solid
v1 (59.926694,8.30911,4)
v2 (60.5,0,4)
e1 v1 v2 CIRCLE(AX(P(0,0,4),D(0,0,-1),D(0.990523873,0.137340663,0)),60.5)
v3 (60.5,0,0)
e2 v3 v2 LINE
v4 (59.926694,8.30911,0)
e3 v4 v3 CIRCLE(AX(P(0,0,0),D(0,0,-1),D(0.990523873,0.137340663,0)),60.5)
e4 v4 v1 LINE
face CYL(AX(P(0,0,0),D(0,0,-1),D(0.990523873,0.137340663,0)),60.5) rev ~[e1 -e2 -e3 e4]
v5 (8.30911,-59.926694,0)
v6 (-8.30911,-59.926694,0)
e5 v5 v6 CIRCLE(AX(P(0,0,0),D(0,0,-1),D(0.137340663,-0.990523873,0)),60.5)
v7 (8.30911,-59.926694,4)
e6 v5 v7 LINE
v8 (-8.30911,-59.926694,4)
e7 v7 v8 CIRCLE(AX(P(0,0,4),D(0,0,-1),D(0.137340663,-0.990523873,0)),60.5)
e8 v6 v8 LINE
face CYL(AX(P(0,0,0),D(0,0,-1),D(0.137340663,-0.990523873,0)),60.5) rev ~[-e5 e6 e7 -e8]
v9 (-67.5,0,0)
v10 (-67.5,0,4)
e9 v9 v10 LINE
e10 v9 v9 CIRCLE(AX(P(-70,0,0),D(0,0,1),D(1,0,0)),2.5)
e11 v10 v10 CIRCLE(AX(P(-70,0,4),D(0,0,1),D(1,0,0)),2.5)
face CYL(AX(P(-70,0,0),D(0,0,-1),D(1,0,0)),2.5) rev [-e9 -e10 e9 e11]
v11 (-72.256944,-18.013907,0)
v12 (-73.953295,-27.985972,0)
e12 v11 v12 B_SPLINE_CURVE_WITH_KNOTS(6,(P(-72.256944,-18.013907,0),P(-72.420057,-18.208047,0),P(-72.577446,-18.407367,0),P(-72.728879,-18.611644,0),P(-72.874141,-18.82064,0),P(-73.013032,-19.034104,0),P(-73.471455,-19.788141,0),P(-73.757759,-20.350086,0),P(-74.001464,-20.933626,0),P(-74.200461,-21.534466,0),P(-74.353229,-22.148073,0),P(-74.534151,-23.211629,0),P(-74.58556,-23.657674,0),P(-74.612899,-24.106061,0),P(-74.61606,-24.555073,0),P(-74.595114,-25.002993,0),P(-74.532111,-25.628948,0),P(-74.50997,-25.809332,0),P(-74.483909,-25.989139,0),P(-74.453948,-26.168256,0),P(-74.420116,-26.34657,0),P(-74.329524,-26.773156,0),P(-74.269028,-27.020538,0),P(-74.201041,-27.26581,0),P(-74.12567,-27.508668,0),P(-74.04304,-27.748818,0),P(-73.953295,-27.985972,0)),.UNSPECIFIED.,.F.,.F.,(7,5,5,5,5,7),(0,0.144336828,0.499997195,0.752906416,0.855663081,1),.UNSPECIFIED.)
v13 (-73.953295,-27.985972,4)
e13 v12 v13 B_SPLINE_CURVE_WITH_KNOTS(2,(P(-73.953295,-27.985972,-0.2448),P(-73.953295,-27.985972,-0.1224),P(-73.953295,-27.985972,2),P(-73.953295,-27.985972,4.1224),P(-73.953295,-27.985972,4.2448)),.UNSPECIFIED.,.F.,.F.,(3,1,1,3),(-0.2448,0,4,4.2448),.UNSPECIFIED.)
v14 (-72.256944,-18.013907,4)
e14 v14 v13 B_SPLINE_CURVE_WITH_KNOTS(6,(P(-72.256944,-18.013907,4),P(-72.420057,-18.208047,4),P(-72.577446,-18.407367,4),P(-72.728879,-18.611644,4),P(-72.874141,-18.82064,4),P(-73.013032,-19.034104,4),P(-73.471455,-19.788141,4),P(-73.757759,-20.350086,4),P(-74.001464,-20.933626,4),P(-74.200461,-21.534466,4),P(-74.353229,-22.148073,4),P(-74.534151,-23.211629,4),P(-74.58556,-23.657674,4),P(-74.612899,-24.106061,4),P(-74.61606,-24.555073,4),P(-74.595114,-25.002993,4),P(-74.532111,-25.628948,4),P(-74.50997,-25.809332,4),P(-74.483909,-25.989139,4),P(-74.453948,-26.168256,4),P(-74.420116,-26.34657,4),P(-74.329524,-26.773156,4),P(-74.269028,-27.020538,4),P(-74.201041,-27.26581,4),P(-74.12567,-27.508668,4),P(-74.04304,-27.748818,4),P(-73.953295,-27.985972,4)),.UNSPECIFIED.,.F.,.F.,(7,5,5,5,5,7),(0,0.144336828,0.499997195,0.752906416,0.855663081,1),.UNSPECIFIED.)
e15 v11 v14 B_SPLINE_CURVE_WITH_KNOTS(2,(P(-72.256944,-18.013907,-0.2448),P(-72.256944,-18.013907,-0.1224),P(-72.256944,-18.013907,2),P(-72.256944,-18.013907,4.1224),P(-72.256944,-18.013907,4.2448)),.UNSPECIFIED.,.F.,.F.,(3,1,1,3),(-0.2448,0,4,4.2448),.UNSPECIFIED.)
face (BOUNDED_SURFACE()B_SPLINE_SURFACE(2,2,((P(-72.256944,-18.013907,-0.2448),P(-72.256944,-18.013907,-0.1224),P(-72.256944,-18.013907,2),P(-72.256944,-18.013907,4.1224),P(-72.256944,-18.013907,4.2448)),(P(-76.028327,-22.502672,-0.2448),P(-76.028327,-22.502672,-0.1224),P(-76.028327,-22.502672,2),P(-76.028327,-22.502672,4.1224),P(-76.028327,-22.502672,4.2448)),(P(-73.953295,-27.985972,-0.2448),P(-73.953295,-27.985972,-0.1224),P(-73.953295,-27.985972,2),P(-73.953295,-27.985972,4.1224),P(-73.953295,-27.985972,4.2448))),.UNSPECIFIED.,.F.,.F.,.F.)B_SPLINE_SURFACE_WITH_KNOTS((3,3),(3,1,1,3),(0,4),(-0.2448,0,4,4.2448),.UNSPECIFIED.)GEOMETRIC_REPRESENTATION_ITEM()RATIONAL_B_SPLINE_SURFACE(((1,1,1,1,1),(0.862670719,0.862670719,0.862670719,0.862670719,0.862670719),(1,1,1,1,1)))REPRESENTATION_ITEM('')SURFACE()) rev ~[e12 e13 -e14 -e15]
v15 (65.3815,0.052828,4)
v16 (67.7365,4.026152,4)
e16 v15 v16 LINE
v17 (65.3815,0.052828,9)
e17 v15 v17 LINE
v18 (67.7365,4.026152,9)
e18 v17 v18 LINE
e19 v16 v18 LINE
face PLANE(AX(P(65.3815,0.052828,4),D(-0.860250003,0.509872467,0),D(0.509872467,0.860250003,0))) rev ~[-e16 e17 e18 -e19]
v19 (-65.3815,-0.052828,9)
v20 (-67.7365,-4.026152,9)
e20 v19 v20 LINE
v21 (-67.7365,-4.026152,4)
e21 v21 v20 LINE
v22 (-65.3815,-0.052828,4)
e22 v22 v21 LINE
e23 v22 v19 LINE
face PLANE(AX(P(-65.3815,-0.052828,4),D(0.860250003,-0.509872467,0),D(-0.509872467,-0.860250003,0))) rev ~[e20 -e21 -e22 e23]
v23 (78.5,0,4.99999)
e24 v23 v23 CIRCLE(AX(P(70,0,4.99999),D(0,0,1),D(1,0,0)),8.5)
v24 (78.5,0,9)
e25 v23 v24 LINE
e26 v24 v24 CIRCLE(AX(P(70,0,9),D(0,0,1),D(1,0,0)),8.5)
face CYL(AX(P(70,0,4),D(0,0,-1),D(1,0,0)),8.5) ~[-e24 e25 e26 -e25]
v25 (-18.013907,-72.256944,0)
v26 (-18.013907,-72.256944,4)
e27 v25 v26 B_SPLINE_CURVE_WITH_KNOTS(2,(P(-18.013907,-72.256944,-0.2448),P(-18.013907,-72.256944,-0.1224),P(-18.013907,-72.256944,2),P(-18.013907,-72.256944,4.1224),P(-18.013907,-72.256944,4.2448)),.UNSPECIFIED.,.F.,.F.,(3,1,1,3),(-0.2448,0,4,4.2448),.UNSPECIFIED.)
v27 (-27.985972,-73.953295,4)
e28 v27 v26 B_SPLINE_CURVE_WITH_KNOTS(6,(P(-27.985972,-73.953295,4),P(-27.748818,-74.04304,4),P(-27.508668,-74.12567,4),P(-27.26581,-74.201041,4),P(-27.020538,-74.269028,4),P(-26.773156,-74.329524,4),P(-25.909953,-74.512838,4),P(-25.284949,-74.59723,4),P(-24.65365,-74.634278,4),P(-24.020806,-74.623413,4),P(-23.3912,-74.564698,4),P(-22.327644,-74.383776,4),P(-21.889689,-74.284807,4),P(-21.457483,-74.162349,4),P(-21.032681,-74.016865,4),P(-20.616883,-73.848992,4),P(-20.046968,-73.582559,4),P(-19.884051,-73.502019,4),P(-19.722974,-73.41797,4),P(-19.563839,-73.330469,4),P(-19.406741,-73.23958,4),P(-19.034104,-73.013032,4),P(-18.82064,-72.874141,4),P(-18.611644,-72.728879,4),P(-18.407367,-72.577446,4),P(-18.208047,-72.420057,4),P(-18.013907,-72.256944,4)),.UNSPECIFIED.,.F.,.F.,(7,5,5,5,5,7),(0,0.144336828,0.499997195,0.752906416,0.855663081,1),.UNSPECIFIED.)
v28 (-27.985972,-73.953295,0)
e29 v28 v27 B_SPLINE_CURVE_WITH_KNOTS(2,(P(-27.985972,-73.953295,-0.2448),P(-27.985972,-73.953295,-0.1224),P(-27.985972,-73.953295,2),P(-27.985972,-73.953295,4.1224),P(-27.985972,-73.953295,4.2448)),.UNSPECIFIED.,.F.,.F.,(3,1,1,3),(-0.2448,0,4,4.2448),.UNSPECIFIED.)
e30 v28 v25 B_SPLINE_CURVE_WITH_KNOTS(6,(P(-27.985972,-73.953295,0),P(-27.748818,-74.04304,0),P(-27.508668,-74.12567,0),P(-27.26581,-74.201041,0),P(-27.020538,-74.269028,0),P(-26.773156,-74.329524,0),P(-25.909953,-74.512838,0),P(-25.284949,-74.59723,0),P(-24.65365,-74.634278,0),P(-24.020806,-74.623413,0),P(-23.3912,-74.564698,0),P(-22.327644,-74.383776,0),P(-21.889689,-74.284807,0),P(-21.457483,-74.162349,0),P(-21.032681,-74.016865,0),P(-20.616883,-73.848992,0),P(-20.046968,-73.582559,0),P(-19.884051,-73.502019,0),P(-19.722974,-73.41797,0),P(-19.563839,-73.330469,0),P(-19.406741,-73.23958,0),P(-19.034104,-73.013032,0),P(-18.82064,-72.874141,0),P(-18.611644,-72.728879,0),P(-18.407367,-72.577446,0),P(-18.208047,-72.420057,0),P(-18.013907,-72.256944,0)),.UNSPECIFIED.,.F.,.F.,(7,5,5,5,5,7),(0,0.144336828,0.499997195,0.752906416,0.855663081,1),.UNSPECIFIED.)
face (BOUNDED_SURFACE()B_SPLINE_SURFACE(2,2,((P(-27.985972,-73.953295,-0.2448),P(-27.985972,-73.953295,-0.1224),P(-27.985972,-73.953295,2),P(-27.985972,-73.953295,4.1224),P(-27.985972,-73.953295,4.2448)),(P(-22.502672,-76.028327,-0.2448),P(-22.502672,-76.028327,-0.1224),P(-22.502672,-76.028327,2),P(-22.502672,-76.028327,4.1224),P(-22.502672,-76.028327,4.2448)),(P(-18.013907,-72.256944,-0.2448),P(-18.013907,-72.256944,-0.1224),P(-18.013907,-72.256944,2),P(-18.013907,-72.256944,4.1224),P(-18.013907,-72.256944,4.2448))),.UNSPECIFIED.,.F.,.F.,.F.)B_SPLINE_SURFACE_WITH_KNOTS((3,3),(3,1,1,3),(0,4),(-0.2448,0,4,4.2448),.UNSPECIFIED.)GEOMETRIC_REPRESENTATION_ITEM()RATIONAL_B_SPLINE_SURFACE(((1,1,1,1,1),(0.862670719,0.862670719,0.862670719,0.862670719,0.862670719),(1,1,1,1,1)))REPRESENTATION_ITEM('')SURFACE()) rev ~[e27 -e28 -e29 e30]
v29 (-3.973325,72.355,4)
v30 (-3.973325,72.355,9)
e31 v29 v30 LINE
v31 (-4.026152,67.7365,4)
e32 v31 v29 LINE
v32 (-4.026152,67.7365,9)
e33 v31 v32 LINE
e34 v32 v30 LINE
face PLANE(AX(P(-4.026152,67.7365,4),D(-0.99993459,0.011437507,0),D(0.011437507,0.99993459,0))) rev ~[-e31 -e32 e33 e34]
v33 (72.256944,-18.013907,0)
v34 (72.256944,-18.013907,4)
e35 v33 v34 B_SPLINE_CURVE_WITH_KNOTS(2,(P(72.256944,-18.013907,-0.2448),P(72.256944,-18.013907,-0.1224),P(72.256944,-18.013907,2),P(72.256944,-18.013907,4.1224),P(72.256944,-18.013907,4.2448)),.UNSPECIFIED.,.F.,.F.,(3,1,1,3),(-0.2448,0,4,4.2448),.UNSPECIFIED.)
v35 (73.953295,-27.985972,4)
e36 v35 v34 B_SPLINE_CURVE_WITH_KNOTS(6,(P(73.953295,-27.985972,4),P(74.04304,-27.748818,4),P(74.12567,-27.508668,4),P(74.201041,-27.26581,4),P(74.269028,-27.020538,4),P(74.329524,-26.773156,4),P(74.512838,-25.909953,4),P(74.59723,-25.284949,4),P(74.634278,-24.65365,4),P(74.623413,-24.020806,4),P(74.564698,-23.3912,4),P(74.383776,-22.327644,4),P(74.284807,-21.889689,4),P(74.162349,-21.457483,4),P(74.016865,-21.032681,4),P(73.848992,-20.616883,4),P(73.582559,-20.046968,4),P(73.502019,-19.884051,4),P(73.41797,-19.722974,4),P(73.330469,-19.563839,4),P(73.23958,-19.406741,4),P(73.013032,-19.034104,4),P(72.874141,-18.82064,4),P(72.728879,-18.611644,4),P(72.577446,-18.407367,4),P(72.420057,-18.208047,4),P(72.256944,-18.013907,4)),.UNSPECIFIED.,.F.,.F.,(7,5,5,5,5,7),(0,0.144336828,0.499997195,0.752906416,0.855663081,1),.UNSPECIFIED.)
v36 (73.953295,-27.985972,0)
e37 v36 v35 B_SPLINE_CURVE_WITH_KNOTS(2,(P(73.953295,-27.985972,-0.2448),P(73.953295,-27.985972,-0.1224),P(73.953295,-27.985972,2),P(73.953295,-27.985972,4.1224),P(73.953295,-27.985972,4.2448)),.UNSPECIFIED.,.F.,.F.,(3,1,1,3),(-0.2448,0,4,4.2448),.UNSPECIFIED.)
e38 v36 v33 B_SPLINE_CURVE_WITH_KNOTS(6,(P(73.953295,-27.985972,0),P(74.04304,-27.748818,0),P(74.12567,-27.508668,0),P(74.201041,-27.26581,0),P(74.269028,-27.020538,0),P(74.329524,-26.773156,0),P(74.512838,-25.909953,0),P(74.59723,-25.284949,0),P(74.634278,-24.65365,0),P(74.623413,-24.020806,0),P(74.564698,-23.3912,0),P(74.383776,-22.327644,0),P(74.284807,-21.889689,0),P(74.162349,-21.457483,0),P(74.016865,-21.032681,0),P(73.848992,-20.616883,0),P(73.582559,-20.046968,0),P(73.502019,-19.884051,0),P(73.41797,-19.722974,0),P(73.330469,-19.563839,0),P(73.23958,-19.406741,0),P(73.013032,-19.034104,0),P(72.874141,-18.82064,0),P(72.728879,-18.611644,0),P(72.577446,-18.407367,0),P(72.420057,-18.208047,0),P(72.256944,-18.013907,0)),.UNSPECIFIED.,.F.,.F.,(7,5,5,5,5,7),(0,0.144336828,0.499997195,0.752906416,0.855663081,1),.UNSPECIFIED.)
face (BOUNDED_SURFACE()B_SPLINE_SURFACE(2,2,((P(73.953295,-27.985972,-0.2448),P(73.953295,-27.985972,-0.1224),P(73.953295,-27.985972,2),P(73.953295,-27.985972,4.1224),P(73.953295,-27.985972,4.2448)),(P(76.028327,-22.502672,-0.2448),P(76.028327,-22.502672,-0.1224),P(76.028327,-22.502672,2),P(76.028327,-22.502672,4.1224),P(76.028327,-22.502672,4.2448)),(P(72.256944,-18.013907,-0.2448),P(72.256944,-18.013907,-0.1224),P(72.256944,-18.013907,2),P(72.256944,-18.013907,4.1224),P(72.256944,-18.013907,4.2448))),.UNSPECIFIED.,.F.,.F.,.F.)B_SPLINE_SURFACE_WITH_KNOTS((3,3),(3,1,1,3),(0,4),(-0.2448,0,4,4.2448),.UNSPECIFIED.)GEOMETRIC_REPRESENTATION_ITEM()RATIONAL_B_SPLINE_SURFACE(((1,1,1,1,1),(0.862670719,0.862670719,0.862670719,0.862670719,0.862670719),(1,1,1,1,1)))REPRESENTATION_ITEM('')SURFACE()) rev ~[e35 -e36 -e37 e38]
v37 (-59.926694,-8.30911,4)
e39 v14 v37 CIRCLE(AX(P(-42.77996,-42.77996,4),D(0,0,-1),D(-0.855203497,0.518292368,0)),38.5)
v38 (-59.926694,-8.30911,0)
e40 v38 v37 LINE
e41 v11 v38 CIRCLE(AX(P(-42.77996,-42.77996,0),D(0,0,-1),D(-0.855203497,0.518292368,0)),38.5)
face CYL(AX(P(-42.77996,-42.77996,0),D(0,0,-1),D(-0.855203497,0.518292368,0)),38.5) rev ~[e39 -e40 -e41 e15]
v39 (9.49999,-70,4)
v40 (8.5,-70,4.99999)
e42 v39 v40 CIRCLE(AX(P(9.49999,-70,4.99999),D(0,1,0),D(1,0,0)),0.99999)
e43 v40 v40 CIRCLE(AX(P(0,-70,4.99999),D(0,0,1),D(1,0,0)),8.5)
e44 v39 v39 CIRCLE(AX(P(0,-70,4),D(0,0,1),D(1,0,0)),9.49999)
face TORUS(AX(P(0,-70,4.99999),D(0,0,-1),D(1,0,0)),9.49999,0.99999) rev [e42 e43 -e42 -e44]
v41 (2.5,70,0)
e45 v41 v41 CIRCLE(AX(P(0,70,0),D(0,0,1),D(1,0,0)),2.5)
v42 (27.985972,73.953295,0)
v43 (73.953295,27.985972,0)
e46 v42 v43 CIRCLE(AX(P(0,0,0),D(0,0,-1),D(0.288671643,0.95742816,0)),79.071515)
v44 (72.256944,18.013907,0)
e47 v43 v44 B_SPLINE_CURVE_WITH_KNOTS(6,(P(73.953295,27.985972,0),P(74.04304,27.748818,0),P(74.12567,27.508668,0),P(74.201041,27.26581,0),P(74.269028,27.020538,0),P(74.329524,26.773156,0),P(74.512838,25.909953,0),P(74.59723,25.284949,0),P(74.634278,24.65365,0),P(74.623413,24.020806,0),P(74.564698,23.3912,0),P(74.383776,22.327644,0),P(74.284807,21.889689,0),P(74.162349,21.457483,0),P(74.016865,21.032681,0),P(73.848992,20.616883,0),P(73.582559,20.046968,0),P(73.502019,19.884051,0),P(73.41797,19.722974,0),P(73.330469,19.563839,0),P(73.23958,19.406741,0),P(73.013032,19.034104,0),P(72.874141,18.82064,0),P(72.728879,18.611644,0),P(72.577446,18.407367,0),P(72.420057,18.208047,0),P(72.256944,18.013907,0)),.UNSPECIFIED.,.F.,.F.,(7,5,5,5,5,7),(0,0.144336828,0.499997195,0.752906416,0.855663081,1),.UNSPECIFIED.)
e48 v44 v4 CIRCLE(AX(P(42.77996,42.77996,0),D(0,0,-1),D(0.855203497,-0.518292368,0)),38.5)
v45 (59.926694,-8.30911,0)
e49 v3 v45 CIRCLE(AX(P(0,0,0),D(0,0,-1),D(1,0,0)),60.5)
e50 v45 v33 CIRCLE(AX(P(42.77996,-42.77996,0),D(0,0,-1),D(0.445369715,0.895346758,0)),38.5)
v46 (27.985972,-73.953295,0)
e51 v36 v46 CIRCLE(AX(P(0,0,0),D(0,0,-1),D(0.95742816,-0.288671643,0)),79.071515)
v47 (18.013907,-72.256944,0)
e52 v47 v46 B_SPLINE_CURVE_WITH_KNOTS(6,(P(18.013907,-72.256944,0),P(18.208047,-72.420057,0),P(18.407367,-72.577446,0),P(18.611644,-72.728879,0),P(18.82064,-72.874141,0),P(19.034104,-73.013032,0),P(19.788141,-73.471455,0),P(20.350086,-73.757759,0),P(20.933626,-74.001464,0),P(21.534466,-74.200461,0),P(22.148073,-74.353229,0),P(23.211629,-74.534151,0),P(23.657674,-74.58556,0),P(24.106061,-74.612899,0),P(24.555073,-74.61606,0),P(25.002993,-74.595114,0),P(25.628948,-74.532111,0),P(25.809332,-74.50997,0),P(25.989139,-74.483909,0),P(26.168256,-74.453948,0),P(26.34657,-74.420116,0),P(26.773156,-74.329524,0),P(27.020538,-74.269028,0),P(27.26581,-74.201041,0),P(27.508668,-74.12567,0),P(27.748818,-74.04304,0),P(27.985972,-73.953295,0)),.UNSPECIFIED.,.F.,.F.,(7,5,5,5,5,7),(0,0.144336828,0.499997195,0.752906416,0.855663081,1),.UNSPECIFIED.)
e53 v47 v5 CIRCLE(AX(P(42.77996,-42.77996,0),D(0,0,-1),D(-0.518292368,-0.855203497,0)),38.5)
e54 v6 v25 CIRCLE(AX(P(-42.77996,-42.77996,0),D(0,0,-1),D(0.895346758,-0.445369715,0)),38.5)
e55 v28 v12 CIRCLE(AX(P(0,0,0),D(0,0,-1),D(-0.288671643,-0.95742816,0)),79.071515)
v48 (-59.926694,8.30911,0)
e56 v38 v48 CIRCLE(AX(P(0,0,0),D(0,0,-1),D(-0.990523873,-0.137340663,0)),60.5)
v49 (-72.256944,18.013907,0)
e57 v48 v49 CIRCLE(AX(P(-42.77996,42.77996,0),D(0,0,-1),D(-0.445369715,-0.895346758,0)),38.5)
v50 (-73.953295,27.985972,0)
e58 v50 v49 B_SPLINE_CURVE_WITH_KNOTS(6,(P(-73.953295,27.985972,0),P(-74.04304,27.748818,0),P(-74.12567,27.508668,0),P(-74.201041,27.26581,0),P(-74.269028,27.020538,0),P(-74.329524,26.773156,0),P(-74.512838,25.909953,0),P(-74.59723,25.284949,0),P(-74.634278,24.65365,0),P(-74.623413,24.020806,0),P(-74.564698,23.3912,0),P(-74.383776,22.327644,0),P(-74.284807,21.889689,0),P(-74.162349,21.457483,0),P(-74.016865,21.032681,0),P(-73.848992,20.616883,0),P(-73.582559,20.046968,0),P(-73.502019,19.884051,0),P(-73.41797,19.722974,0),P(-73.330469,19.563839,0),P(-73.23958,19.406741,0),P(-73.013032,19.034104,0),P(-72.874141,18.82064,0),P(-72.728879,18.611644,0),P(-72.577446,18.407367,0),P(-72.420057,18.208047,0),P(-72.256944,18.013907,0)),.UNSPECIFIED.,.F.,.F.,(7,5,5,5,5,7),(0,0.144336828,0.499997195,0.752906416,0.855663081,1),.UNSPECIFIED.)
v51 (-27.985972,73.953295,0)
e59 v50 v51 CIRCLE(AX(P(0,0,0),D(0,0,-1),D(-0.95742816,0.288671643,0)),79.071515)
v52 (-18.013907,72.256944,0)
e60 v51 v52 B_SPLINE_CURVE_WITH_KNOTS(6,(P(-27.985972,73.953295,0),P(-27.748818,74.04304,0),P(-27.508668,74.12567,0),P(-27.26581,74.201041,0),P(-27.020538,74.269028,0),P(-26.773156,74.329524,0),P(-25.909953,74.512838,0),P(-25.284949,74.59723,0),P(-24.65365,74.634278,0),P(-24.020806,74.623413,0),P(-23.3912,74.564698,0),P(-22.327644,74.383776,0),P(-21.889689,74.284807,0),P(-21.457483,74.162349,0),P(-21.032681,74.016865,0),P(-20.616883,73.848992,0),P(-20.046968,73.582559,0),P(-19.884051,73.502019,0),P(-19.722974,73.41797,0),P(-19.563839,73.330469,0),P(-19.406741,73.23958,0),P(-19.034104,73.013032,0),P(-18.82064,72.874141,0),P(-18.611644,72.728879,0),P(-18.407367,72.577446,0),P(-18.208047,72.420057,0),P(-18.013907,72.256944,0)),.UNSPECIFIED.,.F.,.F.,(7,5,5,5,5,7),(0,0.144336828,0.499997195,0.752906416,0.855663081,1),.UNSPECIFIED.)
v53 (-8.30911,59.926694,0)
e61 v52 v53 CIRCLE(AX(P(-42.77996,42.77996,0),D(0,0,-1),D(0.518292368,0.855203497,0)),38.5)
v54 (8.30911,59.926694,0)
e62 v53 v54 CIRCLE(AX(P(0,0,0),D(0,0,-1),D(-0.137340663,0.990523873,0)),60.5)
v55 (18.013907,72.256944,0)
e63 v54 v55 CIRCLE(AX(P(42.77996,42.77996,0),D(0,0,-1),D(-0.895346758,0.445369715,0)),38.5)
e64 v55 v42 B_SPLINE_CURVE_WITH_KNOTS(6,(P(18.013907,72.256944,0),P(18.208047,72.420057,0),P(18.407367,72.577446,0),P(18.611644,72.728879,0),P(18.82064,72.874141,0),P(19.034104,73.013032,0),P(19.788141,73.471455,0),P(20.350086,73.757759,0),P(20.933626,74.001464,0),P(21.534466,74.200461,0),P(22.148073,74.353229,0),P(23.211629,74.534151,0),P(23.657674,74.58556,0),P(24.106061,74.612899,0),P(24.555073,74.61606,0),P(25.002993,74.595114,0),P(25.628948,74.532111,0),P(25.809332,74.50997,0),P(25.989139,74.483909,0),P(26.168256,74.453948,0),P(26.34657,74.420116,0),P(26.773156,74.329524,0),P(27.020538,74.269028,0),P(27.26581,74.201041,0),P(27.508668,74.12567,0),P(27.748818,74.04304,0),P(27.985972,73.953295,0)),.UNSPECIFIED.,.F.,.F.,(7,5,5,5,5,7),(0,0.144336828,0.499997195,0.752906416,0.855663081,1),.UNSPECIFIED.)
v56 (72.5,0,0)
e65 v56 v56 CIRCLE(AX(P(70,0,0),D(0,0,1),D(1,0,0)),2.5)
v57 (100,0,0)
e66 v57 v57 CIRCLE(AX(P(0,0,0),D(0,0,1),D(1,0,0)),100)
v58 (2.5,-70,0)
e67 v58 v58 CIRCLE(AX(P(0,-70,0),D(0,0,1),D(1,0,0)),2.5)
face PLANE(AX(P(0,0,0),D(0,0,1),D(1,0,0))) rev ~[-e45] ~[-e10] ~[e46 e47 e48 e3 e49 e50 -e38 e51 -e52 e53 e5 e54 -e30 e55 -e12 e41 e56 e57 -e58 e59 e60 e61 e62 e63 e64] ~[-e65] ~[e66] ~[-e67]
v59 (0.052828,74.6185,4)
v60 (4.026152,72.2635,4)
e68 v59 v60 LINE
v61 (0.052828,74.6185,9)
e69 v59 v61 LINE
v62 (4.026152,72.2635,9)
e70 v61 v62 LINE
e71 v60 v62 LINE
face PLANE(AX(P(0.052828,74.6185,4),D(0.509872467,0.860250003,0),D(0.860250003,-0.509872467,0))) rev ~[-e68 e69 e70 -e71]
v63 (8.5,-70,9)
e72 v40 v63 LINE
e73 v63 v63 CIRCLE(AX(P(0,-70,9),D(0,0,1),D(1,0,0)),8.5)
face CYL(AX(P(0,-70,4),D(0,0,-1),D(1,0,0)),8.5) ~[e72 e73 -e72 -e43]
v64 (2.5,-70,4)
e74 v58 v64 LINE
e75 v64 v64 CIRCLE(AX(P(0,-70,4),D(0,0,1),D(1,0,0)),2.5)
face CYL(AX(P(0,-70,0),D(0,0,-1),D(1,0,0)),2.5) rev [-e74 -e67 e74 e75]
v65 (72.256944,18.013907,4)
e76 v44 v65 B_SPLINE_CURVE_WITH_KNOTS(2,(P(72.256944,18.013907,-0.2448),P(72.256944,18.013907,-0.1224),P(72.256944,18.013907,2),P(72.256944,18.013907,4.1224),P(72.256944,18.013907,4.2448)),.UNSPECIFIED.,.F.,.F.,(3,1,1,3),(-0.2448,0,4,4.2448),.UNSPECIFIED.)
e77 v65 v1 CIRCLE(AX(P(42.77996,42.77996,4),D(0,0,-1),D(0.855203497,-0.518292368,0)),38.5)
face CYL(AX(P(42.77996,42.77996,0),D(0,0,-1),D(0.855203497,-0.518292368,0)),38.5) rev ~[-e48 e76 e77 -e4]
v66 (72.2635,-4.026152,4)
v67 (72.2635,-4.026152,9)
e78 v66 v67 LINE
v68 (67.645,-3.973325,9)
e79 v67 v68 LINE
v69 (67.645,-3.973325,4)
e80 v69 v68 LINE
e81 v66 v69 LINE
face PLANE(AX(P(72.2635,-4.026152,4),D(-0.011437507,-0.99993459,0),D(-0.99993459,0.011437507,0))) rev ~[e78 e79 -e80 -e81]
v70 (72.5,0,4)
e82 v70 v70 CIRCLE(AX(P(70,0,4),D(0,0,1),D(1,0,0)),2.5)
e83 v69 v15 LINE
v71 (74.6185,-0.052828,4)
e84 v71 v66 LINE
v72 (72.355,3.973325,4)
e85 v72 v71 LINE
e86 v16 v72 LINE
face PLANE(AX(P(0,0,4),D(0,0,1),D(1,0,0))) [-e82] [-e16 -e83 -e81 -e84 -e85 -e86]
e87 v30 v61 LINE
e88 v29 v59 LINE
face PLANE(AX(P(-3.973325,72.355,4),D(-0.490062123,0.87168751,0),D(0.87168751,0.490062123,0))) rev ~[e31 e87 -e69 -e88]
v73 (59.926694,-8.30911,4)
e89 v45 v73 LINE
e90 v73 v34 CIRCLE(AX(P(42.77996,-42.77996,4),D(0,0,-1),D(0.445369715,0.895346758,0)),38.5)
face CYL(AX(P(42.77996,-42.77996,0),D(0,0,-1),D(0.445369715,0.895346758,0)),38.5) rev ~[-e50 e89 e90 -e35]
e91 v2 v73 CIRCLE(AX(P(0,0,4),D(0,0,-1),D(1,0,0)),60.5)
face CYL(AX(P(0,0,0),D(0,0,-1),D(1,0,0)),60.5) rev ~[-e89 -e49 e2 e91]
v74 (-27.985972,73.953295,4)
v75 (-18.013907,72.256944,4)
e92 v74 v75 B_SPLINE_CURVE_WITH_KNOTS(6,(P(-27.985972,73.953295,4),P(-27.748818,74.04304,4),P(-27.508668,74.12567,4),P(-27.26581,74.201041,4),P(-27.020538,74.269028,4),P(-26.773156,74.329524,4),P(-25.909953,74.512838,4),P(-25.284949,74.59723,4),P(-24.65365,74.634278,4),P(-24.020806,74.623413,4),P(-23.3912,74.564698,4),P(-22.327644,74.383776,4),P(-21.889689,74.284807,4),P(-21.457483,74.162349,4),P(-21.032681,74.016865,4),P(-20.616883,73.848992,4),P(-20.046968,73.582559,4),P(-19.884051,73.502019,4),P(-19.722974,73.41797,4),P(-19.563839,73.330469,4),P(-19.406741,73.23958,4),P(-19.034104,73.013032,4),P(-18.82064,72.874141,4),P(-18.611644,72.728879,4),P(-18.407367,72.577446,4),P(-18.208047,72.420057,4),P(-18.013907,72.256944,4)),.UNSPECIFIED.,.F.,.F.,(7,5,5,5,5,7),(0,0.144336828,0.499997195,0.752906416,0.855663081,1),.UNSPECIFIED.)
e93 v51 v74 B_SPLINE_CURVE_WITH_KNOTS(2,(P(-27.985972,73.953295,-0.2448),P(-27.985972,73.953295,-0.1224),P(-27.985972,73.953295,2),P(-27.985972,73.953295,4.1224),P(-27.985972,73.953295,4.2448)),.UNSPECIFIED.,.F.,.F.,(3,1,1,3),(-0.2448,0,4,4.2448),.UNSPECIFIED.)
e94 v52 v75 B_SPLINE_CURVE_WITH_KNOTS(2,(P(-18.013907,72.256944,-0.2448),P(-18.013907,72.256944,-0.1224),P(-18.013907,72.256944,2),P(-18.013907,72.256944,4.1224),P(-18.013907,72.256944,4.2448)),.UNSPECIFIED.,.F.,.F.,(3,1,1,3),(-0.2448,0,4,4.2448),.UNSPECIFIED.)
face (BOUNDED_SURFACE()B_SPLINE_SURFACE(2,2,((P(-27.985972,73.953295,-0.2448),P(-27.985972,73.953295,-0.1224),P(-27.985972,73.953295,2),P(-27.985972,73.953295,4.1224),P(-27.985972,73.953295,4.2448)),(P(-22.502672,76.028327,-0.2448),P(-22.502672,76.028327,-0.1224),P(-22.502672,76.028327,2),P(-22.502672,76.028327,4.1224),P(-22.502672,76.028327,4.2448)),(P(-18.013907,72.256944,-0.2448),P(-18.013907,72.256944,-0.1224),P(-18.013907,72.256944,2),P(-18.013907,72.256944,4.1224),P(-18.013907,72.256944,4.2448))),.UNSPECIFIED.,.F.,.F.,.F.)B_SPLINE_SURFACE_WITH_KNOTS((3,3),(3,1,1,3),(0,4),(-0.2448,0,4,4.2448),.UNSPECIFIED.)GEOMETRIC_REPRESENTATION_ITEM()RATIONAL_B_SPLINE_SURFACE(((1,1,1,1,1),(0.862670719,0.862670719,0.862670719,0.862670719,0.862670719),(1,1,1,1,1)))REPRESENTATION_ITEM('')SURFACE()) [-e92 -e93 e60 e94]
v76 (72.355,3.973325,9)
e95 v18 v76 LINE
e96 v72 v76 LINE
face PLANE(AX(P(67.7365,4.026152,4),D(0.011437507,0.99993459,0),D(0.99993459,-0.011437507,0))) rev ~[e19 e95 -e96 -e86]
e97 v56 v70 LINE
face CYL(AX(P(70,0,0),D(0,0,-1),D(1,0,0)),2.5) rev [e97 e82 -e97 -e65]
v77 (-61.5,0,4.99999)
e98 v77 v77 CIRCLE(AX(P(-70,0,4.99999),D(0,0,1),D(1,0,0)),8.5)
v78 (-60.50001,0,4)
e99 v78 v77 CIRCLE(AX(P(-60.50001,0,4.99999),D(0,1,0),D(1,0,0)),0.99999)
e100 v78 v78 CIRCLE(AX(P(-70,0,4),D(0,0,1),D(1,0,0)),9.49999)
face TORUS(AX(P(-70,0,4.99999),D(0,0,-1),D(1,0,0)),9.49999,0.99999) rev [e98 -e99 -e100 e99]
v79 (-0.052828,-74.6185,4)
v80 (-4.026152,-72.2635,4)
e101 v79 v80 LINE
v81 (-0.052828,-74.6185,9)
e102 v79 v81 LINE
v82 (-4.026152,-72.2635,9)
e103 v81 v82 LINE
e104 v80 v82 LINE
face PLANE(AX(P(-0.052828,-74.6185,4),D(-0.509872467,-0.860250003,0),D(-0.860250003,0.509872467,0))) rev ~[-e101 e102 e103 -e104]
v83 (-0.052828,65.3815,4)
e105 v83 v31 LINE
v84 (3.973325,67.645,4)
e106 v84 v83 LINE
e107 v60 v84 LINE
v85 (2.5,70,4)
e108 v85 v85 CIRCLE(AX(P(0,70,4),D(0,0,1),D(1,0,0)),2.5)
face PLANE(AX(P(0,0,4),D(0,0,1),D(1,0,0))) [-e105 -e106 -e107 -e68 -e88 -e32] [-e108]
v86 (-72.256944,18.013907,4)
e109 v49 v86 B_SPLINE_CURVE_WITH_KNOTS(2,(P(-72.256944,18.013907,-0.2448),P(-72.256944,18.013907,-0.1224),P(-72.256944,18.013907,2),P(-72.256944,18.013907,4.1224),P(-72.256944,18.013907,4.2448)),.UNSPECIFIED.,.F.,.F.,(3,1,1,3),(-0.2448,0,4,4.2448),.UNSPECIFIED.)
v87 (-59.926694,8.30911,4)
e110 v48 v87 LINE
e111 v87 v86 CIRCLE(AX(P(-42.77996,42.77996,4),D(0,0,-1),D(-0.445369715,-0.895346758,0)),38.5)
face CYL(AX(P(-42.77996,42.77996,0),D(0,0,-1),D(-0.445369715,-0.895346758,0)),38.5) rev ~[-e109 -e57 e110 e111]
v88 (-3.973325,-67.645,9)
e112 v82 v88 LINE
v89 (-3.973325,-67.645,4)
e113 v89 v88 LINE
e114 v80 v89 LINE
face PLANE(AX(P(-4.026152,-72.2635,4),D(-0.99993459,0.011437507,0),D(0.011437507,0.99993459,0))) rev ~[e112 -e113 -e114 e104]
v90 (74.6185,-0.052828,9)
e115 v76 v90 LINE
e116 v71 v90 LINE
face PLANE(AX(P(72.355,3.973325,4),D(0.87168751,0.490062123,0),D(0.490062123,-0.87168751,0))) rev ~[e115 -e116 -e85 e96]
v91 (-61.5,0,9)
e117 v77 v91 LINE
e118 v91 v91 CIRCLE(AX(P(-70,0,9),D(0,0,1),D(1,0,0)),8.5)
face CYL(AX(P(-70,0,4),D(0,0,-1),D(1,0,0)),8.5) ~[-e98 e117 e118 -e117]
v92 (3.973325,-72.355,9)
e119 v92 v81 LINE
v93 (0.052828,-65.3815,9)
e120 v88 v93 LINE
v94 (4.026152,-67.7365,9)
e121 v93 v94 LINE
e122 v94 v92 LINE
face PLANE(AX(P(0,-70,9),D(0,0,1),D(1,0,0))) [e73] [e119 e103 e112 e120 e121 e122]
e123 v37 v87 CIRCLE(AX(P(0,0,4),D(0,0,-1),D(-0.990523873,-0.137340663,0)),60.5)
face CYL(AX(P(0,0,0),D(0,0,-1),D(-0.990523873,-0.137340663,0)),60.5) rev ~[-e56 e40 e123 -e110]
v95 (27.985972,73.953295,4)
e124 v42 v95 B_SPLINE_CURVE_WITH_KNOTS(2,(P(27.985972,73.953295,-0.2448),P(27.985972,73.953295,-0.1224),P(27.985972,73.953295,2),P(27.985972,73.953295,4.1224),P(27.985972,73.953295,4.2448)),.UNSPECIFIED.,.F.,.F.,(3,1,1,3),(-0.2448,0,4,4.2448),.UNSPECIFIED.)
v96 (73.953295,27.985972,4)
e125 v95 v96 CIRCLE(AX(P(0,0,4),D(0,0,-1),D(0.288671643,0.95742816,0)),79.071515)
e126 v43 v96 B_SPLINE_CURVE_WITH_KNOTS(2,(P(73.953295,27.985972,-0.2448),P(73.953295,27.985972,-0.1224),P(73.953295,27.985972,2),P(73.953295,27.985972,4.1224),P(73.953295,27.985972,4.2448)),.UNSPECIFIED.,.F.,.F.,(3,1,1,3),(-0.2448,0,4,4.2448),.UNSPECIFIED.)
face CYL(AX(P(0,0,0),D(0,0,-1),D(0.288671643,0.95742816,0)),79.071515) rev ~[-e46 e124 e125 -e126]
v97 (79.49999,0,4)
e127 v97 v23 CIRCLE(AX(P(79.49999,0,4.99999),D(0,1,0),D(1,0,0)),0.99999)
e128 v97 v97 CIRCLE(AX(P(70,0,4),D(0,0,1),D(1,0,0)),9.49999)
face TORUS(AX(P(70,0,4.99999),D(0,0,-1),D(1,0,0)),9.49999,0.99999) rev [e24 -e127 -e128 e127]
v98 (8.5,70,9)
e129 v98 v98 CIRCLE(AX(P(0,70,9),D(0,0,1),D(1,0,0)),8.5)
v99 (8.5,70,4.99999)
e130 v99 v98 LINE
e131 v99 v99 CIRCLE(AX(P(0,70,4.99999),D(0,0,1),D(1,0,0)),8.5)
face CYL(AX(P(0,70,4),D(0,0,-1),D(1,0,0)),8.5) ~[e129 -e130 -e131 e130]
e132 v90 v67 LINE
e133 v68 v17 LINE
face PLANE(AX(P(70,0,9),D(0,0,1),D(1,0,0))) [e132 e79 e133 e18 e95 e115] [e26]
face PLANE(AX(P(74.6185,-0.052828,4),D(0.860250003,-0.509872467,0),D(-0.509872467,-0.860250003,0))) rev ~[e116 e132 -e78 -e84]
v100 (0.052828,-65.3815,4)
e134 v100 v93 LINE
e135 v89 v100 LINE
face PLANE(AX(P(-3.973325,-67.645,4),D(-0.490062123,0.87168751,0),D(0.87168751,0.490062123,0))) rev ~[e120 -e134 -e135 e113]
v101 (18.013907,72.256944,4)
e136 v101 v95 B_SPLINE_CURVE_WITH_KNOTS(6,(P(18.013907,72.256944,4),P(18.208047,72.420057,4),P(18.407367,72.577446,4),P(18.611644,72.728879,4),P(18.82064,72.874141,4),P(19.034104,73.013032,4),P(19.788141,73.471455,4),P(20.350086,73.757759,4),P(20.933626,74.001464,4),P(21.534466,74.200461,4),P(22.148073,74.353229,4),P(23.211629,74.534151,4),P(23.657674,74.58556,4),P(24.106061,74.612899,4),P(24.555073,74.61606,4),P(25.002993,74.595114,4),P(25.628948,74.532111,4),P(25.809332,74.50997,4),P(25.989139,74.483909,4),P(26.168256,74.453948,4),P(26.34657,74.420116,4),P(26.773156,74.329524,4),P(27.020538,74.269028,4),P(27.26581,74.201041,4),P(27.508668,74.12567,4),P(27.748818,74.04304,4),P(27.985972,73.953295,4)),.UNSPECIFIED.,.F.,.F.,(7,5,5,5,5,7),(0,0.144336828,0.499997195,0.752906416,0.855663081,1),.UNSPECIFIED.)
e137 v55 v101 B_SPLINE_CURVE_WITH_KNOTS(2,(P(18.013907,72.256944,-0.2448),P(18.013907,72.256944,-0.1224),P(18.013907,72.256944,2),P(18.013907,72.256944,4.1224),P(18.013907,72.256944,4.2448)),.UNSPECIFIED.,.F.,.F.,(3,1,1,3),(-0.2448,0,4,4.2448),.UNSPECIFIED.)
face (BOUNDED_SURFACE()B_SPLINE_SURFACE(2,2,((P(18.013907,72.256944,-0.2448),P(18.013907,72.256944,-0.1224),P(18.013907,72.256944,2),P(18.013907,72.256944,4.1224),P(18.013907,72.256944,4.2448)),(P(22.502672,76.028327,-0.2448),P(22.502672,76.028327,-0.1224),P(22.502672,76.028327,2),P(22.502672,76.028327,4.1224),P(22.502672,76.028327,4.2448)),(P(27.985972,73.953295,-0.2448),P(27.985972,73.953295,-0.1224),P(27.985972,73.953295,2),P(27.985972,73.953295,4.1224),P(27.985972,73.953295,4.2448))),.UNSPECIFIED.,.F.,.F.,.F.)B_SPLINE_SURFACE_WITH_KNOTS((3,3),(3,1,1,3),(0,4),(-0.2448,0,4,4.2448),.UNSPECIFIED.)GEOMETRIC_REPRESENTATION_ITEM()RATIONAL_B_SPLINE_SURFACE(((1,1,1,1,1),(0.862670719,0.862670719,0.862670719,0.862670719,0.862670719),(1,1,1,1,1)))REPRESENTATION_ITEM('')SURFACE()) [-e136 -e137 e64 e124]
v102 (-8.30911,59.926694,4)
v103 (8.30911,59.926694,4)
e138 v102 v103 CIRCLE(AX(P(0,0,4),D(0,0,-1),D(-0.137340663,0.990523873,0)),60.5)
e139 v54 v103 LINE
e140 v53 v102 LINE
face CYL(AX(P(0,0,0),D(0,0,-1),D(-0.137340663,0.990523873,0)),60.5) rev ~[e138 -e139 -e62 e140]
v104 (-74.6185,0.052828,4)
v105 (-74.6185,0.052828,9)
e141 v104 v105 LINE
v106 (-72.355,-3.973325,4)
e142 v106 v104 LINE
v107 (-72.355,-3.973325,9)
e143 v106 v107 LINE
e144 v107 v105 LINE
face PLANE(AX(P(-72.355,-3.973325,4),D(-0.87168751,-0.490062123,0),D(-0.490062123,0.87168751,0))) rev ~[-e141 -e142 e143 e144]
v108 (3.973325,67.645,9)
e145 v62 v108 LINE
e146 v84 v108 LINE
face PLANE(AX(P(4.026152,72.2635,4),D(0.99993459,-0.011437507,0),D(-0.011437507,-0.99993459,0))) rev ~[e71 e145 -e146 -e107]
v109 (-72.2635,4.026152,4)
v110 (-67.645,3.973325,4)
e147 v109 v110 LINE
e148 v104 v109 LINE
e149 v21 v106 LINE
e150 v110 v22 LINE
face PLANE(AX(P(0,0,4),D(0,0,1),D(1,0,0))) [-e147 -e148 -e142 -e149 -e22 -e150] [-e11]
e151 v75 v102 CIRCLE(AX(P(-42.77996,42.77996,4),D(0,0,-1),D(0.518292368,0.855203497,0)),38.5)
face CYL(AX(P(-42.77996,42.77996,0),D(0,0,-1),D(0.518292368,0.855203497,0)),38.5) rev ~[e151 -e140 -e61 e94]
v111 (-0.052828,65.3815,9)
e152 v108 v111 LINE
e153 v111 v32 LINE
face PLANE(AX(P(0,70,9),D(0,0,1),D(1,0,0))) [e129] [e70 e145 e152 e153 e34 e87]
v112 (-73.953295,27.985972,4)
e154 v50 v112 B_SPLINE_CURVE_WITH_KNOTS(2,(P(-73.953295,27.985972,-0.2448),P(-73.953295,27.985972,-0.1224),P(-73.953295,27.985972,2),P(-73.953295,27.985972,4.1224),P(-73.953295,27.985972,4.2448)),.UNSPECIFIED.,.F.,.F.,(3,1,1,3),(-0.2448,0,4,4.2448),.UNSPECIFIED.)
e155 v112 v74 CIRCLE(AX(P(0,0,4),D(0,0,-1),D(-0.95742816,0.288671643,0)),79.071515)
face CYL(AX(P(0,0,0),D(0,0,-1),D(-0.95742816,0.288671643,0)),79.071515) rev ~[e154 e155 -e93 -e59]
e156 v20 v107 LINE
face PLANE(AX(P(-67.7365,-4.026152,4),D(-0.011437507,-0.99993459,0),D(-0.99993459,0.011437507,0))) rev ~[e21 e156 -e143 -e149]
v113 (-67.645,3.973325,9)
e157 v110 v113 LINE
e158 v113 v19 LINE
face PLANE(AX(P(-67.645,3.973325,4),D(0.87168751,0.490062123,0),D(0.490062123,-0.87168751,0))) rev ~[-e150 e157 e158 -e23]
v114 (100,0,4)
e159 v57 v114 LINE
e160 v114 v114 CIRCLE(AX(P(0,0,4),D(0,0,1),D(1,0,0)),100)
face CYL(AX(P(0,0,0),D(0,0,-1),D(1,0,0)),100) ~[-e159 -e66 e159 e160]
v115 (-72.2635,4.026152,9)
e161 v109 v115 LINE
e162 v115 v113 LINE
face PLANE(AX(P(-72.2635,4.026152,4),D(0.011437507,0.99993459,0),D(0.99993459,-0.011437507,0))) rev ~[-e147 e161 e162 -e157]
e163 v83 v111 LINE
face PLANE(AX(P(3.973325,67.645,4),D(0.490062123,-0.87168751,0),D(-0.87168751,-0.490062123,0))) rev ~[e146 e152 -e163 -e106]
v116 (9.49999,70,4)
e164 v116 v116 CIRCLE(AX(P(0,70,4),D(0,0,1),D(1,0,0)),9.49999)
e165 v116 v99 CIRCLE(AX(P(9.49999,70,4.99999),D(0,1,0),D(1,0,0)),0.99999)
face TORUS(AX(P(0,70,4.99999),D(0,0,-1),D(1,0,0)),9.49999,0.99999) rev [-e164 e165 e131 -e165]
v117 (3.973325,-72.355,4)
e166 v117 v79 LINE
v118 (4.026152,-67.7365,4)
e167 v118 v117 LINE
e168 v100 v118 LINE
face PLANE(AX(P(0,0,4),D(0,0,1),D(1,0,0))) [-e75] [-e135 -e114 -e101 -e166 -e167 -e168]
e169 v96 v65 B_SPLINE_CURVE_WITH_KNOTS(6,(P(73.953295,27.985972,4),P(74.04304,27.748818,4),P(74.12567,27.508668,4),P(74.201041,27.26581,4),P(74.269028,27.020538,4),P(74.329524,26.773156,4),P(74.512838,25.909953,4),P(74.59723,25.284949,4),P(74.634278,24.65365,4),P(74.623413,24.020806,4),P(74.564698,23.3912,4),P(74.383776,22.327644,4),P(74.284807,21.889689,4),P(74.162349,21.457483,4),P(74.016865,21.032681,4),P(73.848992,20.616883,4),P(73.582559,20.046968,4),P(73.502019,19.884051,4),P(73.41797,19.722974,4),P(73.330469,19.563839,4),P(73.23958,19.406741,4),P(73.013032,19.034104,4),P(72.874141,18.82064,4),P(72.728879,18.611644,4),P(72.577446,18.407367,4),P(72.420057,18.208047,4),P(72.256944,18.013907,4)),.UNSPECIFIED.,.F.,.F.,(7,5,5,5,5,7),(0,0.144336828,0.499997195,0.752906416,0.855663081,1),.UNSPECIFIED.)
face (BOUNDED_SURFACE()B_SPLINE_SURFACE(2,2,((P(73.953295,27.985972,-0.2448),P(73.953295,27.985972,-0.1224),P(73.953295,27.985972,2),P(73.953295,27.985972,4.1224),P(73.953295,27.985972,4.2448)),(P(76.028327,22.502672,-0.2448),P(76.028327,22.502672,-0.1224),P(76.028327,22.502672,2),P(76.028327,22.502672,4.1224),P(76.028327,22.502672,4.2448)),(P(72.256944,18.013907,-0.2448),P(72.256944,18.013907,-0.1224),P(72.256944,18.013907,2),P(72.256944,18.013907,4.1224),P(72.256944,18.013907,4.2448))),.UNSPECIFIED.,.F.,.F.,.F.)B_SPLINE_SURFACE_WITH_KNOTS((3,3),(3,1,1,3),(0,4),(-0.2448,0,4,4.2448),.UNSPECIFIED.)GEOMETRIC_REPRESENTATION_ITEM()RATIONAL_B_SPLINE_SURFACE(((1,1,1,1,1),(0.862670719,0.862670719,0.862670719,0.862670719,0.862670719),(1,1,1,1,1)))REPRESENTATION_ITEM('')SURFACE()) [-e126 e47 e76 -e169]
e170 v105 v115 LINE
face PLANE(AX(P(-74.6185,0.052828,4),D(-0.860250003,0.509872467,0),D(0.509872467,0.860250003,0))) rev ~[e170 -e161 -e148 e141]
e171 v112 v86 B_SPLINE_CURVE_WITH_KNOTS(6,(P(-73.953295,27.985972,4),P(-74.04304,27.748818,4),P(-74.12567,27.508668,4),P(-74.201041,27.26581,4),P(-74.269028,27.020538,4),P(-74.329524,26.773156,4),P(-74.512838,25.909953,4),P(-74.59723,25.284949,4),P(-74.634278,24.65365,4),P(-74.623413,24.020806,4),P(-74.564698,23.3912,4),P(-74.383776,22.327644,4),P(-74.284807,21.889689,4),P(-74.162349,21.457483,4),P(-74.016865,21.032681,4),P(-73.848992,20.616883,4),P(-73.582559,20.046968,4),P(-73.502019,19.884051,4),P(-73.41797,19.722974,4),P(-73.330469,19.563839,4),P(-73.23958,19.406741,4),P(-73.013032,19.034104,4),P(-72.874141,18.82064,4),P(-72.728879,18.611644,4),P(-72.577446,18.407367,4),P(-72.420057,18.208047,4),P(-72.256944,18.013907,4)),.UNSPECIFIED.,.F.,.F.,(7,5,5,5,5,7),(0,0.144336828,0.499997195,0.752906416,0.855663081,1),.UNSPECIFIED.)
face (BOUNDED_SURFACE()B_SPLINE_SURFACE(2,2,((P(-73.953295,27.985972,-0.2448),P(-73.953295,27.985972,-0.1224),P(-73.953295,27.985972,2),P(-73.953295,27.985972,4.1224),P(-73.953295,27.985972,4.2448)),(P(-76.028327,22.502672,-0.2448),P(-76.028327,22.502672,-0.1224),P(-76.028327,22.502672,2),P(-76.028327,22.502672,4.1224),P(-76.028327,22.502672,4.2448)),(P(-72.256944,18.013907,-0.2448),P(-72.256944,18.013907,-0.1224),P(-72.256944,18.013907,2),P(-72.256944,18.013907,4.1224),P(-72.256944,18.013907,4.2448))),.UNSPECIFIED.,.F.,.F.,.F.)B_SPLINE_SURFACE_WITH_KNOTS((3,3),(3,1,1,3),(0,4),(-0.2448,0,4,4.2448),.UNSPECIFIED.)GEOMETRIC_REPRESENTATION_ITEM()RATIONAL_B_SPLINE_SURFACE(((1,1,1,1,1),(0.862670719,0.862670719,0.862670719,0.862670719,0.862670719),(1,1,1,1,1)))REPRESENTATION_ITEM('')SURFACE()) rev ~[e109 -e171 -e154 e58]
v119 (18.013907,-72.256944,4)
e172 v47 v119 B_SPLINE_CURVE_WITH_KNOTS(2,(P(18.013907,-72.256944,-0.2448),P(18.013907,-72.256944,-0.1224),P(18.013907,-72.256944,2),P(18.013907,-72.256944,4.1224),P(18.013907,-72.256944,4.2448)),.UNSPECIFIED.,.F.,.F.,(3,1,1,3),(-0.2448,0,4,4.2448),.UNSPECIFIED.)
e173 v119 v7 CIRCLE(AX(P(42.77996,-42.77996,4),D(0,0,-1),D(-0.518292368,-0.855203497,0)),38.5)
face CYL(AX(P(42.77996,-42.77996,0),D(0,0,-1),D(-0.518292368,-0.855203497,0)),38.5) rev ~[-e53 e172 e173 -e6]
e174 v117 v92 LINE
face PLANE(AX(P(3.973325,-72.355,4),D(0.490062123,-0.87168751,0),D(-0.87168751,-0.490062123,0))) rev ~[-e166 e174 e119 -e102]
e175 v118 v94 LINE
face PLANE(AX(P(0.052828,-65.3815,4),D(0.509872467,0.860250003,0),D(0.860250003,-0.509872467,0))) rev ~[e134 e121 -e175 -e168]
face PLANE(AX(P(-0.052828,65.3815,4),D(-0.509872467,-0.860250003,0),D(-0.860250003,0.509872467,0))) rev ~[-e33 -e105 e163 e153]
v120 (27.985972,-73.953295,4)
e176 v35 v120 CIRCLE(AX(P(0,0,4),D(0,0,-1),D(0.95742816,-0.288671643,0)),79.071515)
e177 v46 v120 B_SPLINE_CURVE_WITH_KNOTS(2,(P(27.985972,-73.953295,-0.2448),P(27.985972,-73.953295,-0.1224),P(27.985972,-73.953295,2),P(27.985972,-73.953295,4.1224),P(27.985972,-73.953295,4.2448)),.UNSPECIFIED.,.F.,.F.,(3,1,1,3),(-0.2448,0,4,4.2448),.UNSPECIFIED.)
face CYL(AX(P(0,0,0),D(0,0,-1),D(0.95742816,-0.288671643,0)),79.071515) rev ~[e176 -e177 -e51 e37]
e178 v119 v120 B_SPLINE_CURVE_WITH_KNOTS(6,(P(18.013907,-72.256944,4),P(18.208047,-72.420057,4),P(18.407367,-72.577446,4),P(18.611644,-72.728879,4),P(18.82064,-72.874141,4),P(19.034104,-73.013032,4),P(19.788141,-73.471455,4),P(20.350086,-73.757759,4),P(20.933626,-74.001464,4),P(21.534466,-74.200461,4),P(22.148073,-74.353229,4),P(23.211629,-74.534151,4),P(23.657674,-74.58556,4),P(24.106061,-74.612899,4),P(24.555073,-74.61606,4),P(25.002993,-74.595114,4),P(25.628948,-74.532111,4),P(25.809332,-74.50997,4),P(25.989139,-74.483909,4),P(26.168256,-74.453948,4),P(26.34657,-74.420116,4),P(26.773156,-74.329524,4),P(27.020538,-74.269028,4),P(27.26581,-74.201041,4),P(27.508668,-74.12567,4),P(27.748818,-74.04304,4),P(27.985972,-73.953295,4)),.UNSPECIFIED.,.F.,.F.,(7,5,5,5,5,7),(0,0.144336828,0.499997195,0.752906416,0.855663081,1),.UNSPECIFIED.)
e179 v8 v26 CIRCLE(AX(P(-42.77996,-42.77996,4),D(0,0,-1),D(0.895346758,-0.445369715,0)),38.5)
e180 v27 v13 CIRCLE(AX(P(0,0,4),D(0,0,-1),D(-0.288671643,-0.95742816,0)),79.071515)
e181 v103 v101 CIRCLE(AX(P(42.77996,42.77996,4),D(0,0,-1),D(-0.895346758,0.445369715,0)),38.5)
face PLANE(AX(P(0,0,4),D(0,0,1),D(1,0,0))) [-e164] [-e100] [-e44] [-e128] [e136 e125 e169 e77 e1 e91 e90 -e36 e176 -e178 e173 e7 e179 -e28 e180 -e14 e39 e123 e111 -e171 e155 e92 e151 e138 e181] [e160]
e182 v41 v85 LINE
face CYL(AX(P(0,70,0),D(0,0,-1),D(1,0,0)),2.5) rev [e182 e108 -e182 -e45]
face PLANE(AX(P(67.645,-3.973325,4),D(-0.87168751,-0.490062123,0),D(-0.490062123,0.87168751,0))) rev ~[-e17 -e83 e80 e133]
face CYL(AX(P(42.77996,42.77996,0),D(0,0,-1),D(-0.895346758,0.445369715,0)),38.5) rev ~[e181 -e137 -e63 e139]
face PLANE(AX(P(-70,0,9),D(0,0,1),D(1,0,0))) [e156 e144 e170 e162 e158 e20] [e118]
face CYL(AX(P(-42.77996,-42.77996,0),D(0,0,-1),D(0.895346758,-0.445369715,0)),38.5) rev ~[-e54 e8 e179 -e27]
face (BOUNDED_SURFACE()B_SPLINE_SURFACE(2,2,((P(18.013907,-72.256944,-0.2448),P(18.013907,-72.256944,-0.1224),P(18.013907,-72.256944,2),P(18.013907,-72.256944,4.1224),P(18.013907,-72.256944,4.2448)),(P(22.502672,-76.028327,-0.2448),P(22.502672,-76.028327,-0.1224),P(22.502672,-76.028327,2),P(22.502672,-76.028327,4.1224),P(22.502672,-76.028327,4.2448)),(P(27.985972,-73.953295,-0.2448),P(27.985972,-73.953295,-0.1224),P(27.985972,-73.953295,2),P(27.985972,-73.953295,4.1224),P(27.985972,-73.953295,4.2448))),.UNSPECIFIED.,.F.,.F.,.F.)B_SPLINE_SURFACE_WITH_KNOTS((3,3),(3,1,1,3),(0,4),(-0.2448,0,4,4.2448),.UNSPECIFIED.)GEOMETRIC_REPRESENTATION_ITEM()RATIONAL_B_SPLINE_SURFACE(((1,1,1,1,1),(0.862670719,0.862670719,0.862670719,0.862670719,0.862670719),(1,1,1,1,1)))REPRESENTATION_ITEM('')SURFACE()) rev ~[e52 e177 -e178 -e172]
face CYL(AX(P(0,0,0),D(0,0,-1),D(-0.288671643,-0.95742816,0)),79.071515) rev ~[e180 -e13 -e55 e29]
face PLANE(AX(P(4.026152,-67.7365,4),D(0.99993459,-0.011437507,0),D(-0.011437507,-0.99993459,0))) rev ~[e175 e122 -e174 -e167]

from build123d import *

# Parameters (mm, degrees)
F0_R     = 100
F0_R_2   = 2.5
F1_DEPTH = 4
F2_R     = 8.5
F3_DEPTH = 5
F4_R     = 10
F5_R     = 0.99999


# Not quite as in the source:
# - a fillet or chamfer is up to 0.001 mm smaller than in the source, because OpenCascade refuses the exact size


with BuildPart() as f1:
    # F0 (on Top) → F1 (new body)
    with BuildSketch(Plane.XY):
        Circle(F0_R)
        with BuildLine():
            ThreePointArc((22.8257041117, 75.7052949069), (55.9120042797, 55.9120042797), (75.7052949069, 22.8257041117))
            ThreePointArc((75.7052949069, 22.8257041117), (78.2254331665, 11.536292778), (79.0715147518, 0))
            ThreePointArc((79.0715147518, 0), (78.2254331665, -11.536292778), (75.7052949069, -22.8257041117))
            ThreePointArc((75.7052949069, -22.8257041117), (55.9120042797, -55.9120042797), (22.8257041117, -75.7052949069))
            ThreePointArc((22.8257041117, -75.7052949069), (0, -79.0715147518), (-22.8257041117, -75.7052949069))
            ThreePointArc((-22.8257041117, -75.7052949069), (-55.9120042797, -55.9120042797), (-75.7052949069, -22.8257041117))
            ThreePointArc((-75.7052949069, -22.8257041117), (-79.0715147518, 0), (-75.7052949069, 22.8257041117))
            ThreePointArc((-75.7052949069, 22.8257041117), (-55.9120042797, 55.9120042797), (-22.8257041117, 75.7052949069))
            ThreePointArc((-22.8257041117, 75.7052949069), (0, 79.0715147518), (22.8257041117, 75.7052949069))
        make_face(mode=Mode.SUBTRACT)
        with BuildLine():
            ThreePointArc((-8.3091100857, 59.9266942988), (0, 60.5), (8.3091100857, 59.9266942988))
            ThreePointArc((8.3091100857, 59.9266942988), (14.4468681442, 68.8469104297), (22.8257041117, 75.7052949069))
            ThreePointArc((22.8257041117, 75.7052949069), (0, 79.0715147518), (-22.8257041117, 75.7052949069))
            ThreePointArc((-22.8257041117, 75.7052949069), (-14.4468681442, 68.8469104297), (-8.3091100857, 59.9266942988))
        make_face()
        Polygon((0.2799602618, 74.6188021535), (4.2799602618, 72.3094010768), (4.2799602618, 67.6905989232), (0.2799602618, 65.3811978465), (-3.7200397382, 67.6905989232), (-3.7200397382, 72.3094010768), align=None, mode=Mode.SUBTRACT)
        with BuildLine():
            ThreePointArc((-59.9266942988, -8.3091100857), (-60.5, 0), (-59.9266942988, 8.3091100857))
            ThreePointArc((-59.9266942988, 8.3091100857), (-68.8469104297, 14.4468681442), (-75.7052949069, 22.8257041117))
            ThreePointArc((-75.7052949069, 22.8257041117), (-79.0715147518, 0), (-75.7052949069, -22.8257041117))
            ThreePointArc((-75.7052949069, -22.8257041117), (-68.8469104297, -14.4468681442), (-59.9266942988, -8.3091100857))
        make_face()
        Polygon((-65.3811978465, 0.2799602618), (-67.6905989232, -3.7200397382), (-72.3094010768, -3.7200397382), (-74.6188021535, 0.2799602618), (-72.3094010768, 4.2799602618), (-67.6905989232, 4.2799602618), align=None, mode=Mode.SUBTRACT)
        with BuildLine():
            ThreePointArc((59.9266942988, 8.3091100857), (60.3565033989, 4.1644324296), (60.5, 0))
            ThreePointArc((60.5, 0), (60.3565033989, -4.1644324296), (59.9266942988, -8.3091100857))
            ThreePointArc((59.9266942988, -8.3091100857), (68.8469104297, -14.4468681442), (75.7052949069, -22.8257041117))
            ThreePointArc((75.7052949069, -22.8257041117), (78.2254331665, -11.536292778), (79.0715147518, 0))
            ThreePointArc((79.0715147518, 0), (78.2254331665, 11.536292778), (75.7052949069, 22.8257041117))
            ThreePointArc((75.7052949069, 22.8257041117), (68.8469104297, 14.4468681442), (59.9266942988, 8.3091100857))
        make_face()
        Polygon((74.6188021535, -0.2799602618), (72.3094010768, -4.2799602618), (67.6905989232, -4.2799602618), (65.3811978465, -0.2799602618), (67.6905989232, 3.7200397382), (72.3094010768, 3.7200397382), align=None, mode=Mode.SUBTRACT)
        with BuildLine():
            ThreePointArc((22.8257041117, -75.7052949069), (14.4468681442, -68.8469104297), (8.3091100857, -59.9266942988))
            ThreePointArc((8.3091100857, -59.9266942988), (0, -60.5), (-8.3091100857, -59.9266942988))
            ThreePointArc((-8.3091100857, -59.9266942988), (-14.4468681442, -68.8469104297), (-22.8257041117, -75.7052949069))
            ThreePointArc((-22.8257041117, -75.7052949069), (0, -79.0715147518), (22.8257041117, -75.7052949069))
        make_face()
        Polygon((-0.2799602618, -74.6188021535), (-4.2799602618, -72.3094010768), (-4.2799602618, -67.6905989232), (-0.2799602618, -65.3811978465), (3.7200397382, -67.6905989232), (3.7200397382, -72.3094010768), align=None, mode=Mode.SUBTRACT)
        Polygon((-72.3094010768, -3.7200397382), (-67.6905989232, -3.7200397382), (-65.3811978465, 0.2799602618), (-67.6905989232, 4.2799602618), (-72.3094010768, 4.2799602618), (-74.6188021535, 0.2799602618), align=None)
        with Locations((-70, 0)):
            Circle(F0_R_2, mode=Mode.SUBTRACT)
        Polygon((-4.2799602618, -67.6905989232), (-4.2799602618, -72.3094010768), (-0.2799602618, -74.6188021535), (3.7200397382, -72.3094010768), (3.7200397382, -67.6905989232), (-0.2799602618, -65.3811978465), align=None)
        with Locations((0, -70)):
            Circle(F0_R_2, mode=Mode.SUBTRACT)
        Polygon((67.6905989232, -4.2799602618), (72.3094010768, -4.2799602618), (74.6188021535, -0.2799602618), (72.3094010768, 3.7200397382), (67.6905989232, 3.7200397382), (65.3811978465, -0.2799602618), align=None)
        with Locations((70, 0)):
            Circle(F0_R_2, mode=Mode.SUBTRACT)
        Polygon((4.2799602618, 67.6905989232), (4.2799602618, 72.3094010768), (0.2799602618, 74.6188021535), (-3.7200397382, 72.3094010768), (-3.7200397382, 67.6905989232), (0.2799602618, 65.3811978465), align=None)
        with Locations((0, 70)):
            Circle(F0_R_2, mode=Mode.SUBTRACT)
    extrude(amount=F1_DEPTH)

    # F2 (on face) → F3 (join)
    with BuildSketch(Plane.XY.offset(4)):
        with Locations((-70, 0)):
            Circle(F2_R)
        Polygon((-67.7365000122, -4.0261521504), (-72.3550000478, -3.9733245662), (-74.6185000357, 0.0528275843), (-72.2634999878, 4.0261521504), (-67.6449999522, 3.9733245662), (-65.3814999643, -0.0528275843), align=None, mode=Mode.SUBTRACT)
        with Locations((0, 70)):
            Circle(F2_R)
        Polygon((-4.0261521504, 67.7365000122), (-3.9733245662, 72.3550000478), (0.0528275843, 74.6185000357), (4.0261521504, 72.2634999878), (3.9733245662, 67.6449999522), (-0.0528275843, 65.3814999643), align=None, mode=Mode.SUBTRACT)
        with Locations((70, 0)):
            Circle(F2_R)
        Polygon((67.7365000122, 4.0261521504), (72.3550000478, 3.9733245662), (74.6185000357, -0.0528275843), (72.2634999878, -4.0261521504), (67.6449999522, -3.9733245662), (65.3814999643, 0.0528275843), align=None, mode=Mode.SUBTRACT)
        with Locations((0, -70)):
            Circle(F2_R)
        Polygon((4.0261521504, -67.7365000122), (3.9733245662, -72.3550000478), (-0.0528275843, -74.6185000357), (-4.0261521504, -72.2634999878), (-3.9733245662, -67.6449999522), (0.0528275843, -65.3814999643), align=None, mode=Mode.SUBTRACT)
    extrude(amount=F3_DEPTH)

    # F4
    f4_edges = [f1.edges().sort_by_distance(p)[0] for p in [
        (-75.705295, 22.825704, 2),
        (-75.705295, -22.825704, 2),
        (75.705295, -22.825704, 2),
        (22.825704, -75.705295, 2),
        (-22.825704, -75.705295, 2),
        (75.705295, 22.825704, 2),
        (22.825704, 75.705295, 2),
        (-22.825704, 75.705295, 2),
    ]]
    fillet(f4_edges, radius=F4_R)

    # F5 (radius 1 in the source; OpenCascade refuses exactly that, so slightly less here)
    f5_edges = [f1.edges().sort_by_distance(p)[0] for p in [
        (-8.5, -70, 4),
        (-8.5, 70, 4),
        (-78.5, 0, 4),
        (61.5, 0, 4),
    ]]
    fillet(f5_edges, radius=F5_R)


solid = f1.part
